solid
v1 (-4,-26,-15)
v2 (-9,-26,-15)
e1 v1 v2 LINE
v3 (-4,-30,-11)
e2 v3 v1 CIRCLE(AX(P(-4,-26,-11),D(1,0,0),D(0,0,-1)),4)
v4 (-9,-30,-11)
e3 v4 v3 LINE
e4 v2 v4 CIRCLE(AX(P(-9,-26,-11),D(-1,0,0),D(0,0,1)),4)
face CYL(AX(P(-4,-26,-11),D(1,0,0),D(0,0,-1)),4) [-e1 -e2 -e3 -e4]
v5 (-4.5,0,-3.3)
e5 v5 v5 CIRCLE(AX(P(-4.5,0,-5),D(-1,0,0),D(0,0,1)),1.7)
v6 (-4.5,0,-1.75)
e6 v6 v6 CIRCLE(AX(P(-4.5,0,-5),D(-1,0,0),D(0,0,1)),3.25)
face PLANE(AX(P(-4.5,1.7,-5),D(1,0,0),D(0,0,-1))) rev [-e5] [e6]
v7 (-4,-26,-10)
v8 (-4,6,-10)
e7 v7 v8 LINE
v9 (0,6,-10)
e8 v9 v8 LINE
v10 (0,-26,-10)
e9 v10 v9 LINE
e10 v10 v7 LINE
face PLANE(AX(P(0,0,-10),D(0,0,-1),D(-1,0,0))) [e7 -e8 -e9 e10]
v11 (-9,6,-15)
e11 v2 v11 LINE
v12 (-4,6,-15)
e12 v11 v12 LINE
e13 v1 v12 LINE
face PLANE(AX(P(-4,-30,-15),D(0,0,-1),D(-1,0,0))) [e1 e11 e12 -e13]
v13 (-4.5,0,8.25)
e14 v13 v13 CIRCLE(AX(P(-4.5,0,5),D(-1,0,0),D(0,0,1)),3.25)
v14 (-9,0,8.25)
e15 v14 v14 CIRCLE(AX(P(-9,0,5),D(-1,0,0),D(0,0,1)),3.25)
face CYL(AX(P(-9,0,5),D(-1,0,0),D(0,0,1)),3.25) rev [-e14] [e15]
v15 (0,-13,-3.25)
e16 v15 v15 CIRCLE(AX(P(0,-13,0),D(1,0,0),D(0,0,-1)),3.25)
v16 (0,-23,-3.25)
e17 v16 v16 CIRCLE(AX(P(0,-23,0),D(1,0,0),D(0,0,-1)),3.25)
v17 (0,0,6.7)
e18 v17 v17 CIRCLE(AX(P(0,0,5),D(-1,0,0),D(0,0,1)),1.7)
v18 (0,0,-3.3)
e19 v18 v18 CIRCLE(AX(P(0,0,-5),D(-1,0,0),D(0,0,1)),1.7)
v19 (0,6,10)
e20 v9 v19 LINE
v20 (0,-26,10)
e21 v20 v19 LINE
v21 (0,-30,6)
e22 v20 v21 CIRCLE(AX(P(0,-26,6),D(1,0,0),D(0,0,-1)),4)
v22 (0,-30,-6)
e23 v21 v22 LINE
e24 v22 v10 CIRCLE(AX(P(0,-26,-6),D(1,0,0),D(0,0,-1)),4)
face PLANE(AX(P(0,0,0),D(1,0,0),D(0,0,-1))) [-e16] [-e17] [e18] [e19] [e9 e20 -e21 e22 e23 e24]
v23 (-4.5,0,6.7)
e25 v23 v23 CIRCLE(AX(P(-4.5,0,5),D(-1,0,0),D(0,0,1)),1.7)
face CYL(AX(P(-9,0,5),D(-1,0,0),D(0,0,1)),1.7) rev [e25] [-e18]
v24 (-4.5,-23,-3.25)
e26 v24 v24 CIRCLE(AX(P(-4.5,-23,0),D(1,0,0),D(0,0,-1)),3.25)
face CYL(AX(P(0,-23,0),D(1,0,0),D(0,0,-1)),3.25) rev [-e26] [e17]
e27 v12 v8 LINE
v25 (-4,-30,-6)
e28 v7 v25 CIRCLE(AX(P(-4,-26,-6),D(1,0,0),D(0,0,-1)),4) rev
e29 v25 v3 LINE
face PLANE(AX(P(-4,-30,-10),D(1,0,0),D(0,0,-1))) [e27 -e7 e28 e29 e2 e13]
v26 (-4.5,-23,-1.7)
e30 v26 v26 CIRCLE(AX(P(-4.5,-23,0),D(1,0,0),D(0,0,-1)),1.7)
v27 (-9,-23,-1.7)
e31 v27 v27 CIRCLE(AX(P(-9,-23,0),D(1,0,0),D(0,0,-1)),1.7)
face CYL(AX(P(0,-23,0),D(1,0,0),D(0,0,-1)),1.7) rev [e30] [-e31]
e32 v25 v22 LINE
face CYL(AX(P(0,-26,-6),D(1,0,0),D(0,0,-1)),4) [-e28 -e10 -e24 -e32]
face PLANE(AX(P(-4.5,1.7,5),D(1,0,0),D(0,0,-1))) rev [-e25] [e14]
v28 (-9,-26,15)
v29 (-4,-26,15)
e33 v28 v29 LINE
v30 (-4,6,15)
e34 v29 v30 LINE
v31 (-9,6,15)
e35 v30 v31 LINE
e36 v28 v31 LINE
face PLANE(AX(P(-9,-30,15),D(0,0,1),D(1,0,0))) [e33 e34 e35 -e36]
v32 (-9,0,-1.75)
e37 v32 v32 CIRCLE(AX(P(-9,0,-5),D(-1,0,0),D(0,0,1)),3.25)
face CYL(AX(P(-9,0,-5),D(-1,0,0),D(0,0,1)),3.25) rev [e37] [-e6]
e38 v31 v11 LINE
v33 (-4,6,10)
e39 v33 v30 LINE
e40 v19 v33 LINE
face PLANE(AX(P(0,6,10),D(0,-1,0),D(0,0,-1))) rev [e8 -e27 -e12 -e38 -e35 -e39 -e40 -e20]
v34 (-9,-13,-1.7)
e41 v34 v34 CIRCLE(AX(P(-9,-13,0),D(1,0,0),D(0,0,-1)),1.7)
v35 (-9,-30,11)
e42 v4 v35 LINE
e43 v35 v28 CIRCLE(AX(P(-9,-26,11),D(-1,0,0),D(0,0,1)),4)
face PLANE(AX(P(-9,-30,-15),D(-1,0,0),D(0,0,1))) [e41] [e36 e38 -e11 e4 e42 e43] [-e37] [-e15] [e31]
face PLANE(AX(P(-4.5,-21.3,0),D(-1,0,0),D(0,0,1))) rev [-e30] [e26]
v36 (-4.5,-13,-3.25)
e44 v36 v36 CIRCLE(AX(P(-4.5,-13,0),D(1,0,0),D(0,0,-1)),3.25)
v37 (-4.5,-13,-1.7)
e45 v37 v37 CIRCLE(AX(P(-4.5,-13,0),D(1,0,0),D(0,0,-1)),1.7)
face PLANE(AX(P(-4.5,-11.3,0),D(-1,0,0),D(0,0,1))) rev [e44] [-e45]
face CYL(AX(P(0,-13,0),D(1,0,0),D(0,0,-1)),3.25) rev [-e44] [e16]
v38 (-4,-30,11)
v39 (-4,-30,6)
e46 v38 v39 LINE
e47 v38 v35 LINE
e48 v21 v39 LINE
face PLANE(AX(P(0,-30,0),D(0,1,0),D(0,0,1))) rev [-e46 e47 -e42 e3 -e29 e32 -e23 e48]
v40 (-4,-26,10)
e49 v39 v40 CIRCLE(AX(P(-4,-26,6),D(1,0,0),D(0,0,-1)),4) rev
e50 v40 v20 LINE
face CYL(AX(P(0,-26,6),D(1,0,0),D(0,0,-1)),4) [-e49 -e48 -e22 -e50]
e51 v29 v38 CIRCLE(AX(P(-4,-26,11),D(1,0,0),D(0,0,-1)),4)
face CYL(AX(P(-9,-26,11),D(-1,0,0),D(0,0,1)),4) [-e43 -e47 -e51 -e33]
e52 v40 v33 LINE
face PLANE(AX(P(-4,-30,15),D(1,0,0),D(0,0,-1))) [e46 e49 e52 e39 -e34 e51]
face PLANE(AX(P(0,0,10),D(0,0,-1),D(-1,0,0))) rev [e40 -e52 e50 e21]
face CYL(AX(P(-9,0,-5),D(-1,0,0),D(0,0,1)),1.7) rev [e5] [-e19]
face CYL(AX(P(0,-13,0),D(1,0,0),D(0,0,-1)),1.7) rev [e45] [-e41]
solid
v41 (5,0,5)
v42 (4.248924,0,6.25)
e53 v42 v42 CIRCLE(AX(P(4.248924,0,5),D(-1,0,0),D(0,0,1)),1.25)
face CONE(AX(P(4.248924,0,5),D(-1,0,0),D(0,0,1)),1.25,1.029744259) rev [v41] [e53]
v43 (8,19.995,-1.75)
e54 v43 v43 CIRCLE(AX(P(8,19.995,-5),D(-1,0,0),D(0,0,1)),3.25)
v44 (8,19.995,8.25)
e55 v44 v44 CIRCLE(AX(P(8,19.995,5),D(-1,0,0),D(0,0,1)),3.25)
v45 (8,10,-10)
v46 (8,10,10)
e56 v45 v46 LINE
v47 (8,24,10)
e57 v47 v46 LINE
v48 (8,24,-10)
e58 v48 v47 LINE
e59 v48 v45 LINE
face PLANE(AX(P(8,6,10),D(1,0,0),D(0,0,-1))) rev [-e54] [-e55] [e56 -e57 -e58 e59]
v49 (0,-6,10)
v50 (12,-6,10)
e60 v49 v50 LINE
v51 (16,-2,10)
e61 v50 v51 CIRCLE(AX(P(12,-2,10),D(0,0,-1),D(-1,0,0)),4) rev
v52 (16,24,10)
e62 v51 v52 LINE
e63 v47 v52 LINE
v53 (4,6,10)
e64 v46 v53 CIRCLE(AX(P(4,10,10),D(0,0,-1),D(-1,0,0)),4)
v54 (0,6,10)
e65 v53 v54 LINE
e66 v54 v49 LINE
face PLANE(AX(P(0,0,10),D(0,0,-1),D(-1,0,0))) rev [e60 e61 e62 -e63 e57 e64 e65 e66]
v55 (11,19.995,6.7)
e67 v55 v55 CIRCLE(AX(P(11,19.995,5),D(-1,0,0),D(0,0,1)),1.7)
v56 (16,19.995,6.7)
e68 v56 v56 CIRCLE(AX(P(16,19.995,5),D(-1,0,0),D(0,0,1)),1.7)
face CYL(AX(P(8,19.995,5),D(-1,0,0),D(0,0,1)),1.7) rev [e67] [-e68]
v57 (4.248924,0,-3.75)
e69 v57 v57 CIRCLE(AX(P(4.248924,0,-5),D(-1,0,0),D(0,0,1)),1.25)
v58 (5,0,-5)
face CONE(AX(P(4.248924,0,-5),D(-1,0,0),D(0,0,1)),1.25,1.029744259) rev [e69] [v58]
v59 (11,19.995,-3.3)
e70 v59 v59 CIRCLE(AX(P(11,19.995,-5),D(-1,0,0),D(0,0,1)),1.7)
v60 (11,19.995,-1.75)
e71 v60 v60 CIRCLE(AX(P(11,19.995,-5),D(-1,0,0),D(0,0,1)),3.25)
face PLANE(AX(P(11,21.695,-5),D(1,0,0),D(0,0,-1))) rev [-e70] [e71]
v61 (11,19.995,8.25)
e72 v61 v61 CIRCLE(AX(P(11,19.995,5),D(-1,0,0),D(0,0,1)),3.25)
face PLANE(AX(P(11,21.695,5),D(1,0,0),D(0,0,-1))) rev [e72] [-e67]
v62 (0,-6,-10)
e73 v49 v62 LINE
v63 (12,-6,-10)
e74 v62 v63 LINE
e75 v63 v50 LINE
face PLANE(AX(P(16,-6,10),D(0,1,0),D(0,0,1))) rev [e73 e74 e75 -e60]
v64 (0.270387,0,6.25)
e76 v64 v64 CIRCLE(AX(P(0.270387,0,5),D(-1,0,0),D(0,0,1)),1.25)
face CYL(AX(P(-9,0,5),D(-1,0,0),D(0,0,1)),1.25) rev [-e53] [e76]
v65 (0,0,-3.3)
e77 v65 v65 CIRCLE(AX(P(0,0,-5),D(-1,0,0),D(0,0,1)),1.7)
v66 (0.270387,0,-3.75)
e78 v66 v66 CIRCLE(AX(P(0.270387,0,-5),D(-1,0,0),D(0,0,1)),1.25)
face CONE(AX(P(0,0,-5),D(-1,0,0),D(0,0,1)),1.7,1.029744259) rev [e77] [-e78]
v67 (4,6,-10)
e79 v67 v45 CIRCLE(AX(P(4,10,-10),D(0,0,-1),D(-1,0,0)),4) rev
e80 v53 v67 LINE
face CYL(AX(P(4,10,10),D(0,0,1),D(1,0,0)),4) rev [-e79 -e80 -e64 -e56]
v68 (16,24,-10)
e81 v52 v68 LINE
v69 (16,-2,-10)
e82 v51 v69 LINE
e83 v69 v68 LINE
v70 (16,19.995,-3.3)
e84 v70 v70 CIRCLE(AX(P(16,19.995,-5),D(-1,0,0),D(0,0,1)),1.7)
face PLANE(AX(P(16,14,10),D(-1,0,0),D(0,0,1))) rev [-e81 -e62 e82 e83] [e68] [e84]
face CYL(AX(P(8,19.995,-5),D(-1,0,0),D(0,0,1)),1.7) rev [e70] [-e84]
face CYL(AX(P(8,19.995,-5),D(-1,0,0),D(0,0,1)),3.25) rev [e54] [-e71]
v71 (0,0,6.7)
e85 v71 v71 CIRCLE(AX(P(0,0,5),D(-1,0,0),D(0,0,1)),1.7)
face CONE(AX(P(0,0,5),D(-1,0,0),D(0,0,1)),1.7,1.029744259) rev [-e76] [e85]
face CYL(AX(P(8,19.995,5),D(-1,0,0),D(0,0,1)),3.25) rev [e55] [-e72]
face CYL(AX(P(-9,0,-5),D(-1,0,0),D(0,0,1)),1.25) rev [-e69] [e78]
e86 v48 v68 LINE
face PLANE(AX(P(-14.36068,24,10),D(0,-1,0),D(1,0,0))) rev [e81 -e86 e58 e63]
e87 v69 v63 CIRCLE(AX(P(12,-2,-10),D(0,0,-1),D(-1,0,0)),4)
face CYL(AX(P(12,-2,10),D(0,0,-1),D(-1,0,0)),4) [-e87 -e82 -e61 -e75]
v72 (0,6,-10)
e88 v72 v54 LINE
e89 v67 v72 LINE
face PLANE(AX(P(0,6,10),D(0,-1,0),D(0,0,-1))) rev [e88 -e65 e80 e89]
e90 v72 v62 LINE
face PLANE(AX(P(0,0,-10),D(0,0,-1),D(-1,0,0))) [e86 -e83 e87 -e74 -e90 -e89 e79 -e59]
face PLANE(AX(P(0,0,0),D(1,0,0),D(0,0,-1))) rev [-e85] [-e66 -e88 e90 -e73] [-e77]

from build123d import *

# Parameters (mm, degrees)
BOSS_EXTRUDE1_DEPTH             = 10
BOSS_EXTRUDE2_DEPTH             = 6
BOSS_EXTRUDE2_DEPTH_BACK        = 30
BOSS_EXTRUDE4_START             = -8
SKETCH7_W                       = 20
SKETCH7_H                       = 10
BOSS_EXTRUDE4_DEPTH             = 8
CBORE_FOR_M3_SHCS11_D           = 3.4
CBORE_FOR_M3_SHCS11_CBORE_D     = 6.5
CBORE_FOR_M3_SHCS11_CBORE_DEPTH = 4.5
M3X0_5_TAPPED_HOLE1_D           = 2.5
M3X0_5_TAPPED_HOLE1_DEPTH       = 13.248924226
M3X0_5_TAPPED_HOLE1_TIP         = 0.751075774
FILLET3_R                       = 4
FILLET4_R                       = 4
CBORE_FOR_M3_SHCS13_D           = 3.4
CBORE_FOR_M3_SHCS13_DEPTH       = 20
CBORE_FOR_M3_SHCS13_CBORE_D     = 6.5
CBORE_FOR_M3_SHCS13_CBORE_DEPTH = 3
CBORE_FOR_M3_SHCS13_TIP         = 1.021463052


# Read off the part's stored shape, not the designer's step: CBORE for M3 SHCS12
with BuildPart() as part:
    # Sketch1 → Boss-Extrude1 (new, symmetric)
    with BuildSketch(Plane.XY):
        Polygon((16, -6), (0, -6), (0, 6), (8, 6), (8, 14), (16, 14), align=None)
    extrude(amount=BOSS_EXTRUDE1_DEPTH, both=True)

    # Sketch2 → Boss-Extrude2 (add, two sides: drawn at the far end of the back side and taken through both)
    with BuildSketch(Plane(origin=(0, 0, 0), x_dir=(1, 0, 0), z_dir=(0, 1, 0)).offset(-BOSS_EXTRUDE2_DEPTH_BACK)):
        Polygon((-4, 15), (-9, 15), (-9, -15), (-4, -15), (-4, -10), (0, -10), (0, 10), (-4, 10), align=None)
    extrude(amount=BOSS_EXTRUDE2_DEPTH + BOSS_EXTRUDE2_DEPTH_BACK)

    # Sketch7 → Boss-Extrude4 (add)
    with BuildSketch(Plane.ZY.offset(-8).offset(BOSS_EXTRUDE4_START)):
        with Locations((0, 19)):
            Rectangle(SKETCH7_W, SKETCH7_H)
    extrude(amount=BOSS_EXTRUDE4_DEPTH)

    # CBORE for M3 SHCS11 (through all)
    with Locations(Plane(origin=(0, 0, 0), x_dir=(0, 0, -1), z_dir=(1, 0, 0))):
        with Locations((0, -13), (0, -23)):
            CounterBoreHole(CBORE_FOR_M3_SHCS11_D / 2, CBORE_FOR_M3_SHCS11_CBORE_D / 2, CBORE_FOR_M3_SHCS11_CBORE_DEPTH)

    # M3x0.5 Tapped Hole1
    with Locations(Plane.ZY.offset(9)):
        with Locations((-5, 0), (5, 0)):
            Hole(M3X0_5_TAPPED_HOLE1_D / 2, depth=M3X0_5_TAPPED_HOLE1_DEPTH)
            with Locations((0, 0, -(M3X0_5_TAPPED_HOLE1_DEPTH + M3X0_5_TAPPED_HOLE1_TIP / 2))):  # 118° drill point
                Cone(0, M3X0_5_TAPPED_HOLE1_D / 2, M3X0_5_TAPPED_HOLE1_TIP, mode=Mode.SUBTRACT)

    # CBORE for M3 SHCS12 outline → CBORE for M3 SHCS12 (revolve, cut)
    with BuildSketch(Plane.YX.offset(-5)):
        Polygon((1.7, 0), (1.25, 0.270387279), (1.25, -9), (3.25, -9), (3.25, -4.5), (1.7, -4.5), align=None)
    revolve(axis=Axis((0, 0, 5), (1, 0, 0)), mode=Mode.SUBTRACT)

    # CBORE for M3 SHCS12 2 outline → CBORE for M3 SHCS12 2 (revolve, cut)
    with BuildSketch(Plane.YX.offset(5)):
        Polygon((1.25, -9), (3.25, -9), (3.25, -4.5), (1.7, -4.5), (1.7, 0), (1.25, 0.270387279), align=None)
    revolve(axis=Axis((0, 0, -5), (1, 0, 0)), mode=Mode.SUBTRACT)

    # Fillet3
    fillet3_edges = [part.edges().sort_by_distance(p)[0] for p in [
        (16, -6, 0),
        (8, 6, 0),
    ]]
    fillet(fillet3_edges, radius=FILLET3_R)

    # Fillet4
    fillet4_edges = [part.edges().sort_by_distance(p)[0] for p in [
        (-2, -30, -10),
        (-2, -30, 10),
        (-6.5, -30, 15),
        (-6.5, -30, -15),
    ]]
    fillet(fillet4_edges, radius=FILLET4_R)

    # CBORE for M3 SHCS13
    with Locations(Plane(origin=(8, -16.5, 0), x_dir=(0, 0, 1), z_dir=(-1, 0, 0))):
        with Locations((-5, 36.495), (5, 36.495)):
            CounterBoreHole(CBORE_FOR_M3_SHCS13_D / 2, CBORE_FOR_M3_SHCS13_CBORE_D / 2, CBORE_FOR_M3_SHCS13_CBORE_DEPTH, depth=CBORE_FOR_M3_SHCS13_DEPTH)
            with Locations((0, 0, -(CBORE_FOR_M3_SHCS13_DEPTH + CBORE_FOR_M3_SHCS13_TIP / 2))):  # 118° drill point
                Cone(0, CBORE_FOR_M3_SHCS13_D / 2, CBORE_FOR_M3_SHCS13_TIP, mode=Mode.SUBTRACT)


with BuildPart() as body_2:
    # Split1: the piece on the far side of the plane
    add(part.part)
    split(bisect_by=Plane(origin=(0, 0, 0), x_dir=(0, 0, 1), z_dir=(1, 0, 0)), keep=Keep.BOTTOM)


with BuildPart() as part_1:
    add(part.part)

    # Split1
    split(bisect_by=Plane(origin=(0, 0, 0), x_dir=(0, 0, 1), z_dir=(1, 0, 0)), keep=Keep.TOP)


solid = Compound([body_2.part, part_1.part])
